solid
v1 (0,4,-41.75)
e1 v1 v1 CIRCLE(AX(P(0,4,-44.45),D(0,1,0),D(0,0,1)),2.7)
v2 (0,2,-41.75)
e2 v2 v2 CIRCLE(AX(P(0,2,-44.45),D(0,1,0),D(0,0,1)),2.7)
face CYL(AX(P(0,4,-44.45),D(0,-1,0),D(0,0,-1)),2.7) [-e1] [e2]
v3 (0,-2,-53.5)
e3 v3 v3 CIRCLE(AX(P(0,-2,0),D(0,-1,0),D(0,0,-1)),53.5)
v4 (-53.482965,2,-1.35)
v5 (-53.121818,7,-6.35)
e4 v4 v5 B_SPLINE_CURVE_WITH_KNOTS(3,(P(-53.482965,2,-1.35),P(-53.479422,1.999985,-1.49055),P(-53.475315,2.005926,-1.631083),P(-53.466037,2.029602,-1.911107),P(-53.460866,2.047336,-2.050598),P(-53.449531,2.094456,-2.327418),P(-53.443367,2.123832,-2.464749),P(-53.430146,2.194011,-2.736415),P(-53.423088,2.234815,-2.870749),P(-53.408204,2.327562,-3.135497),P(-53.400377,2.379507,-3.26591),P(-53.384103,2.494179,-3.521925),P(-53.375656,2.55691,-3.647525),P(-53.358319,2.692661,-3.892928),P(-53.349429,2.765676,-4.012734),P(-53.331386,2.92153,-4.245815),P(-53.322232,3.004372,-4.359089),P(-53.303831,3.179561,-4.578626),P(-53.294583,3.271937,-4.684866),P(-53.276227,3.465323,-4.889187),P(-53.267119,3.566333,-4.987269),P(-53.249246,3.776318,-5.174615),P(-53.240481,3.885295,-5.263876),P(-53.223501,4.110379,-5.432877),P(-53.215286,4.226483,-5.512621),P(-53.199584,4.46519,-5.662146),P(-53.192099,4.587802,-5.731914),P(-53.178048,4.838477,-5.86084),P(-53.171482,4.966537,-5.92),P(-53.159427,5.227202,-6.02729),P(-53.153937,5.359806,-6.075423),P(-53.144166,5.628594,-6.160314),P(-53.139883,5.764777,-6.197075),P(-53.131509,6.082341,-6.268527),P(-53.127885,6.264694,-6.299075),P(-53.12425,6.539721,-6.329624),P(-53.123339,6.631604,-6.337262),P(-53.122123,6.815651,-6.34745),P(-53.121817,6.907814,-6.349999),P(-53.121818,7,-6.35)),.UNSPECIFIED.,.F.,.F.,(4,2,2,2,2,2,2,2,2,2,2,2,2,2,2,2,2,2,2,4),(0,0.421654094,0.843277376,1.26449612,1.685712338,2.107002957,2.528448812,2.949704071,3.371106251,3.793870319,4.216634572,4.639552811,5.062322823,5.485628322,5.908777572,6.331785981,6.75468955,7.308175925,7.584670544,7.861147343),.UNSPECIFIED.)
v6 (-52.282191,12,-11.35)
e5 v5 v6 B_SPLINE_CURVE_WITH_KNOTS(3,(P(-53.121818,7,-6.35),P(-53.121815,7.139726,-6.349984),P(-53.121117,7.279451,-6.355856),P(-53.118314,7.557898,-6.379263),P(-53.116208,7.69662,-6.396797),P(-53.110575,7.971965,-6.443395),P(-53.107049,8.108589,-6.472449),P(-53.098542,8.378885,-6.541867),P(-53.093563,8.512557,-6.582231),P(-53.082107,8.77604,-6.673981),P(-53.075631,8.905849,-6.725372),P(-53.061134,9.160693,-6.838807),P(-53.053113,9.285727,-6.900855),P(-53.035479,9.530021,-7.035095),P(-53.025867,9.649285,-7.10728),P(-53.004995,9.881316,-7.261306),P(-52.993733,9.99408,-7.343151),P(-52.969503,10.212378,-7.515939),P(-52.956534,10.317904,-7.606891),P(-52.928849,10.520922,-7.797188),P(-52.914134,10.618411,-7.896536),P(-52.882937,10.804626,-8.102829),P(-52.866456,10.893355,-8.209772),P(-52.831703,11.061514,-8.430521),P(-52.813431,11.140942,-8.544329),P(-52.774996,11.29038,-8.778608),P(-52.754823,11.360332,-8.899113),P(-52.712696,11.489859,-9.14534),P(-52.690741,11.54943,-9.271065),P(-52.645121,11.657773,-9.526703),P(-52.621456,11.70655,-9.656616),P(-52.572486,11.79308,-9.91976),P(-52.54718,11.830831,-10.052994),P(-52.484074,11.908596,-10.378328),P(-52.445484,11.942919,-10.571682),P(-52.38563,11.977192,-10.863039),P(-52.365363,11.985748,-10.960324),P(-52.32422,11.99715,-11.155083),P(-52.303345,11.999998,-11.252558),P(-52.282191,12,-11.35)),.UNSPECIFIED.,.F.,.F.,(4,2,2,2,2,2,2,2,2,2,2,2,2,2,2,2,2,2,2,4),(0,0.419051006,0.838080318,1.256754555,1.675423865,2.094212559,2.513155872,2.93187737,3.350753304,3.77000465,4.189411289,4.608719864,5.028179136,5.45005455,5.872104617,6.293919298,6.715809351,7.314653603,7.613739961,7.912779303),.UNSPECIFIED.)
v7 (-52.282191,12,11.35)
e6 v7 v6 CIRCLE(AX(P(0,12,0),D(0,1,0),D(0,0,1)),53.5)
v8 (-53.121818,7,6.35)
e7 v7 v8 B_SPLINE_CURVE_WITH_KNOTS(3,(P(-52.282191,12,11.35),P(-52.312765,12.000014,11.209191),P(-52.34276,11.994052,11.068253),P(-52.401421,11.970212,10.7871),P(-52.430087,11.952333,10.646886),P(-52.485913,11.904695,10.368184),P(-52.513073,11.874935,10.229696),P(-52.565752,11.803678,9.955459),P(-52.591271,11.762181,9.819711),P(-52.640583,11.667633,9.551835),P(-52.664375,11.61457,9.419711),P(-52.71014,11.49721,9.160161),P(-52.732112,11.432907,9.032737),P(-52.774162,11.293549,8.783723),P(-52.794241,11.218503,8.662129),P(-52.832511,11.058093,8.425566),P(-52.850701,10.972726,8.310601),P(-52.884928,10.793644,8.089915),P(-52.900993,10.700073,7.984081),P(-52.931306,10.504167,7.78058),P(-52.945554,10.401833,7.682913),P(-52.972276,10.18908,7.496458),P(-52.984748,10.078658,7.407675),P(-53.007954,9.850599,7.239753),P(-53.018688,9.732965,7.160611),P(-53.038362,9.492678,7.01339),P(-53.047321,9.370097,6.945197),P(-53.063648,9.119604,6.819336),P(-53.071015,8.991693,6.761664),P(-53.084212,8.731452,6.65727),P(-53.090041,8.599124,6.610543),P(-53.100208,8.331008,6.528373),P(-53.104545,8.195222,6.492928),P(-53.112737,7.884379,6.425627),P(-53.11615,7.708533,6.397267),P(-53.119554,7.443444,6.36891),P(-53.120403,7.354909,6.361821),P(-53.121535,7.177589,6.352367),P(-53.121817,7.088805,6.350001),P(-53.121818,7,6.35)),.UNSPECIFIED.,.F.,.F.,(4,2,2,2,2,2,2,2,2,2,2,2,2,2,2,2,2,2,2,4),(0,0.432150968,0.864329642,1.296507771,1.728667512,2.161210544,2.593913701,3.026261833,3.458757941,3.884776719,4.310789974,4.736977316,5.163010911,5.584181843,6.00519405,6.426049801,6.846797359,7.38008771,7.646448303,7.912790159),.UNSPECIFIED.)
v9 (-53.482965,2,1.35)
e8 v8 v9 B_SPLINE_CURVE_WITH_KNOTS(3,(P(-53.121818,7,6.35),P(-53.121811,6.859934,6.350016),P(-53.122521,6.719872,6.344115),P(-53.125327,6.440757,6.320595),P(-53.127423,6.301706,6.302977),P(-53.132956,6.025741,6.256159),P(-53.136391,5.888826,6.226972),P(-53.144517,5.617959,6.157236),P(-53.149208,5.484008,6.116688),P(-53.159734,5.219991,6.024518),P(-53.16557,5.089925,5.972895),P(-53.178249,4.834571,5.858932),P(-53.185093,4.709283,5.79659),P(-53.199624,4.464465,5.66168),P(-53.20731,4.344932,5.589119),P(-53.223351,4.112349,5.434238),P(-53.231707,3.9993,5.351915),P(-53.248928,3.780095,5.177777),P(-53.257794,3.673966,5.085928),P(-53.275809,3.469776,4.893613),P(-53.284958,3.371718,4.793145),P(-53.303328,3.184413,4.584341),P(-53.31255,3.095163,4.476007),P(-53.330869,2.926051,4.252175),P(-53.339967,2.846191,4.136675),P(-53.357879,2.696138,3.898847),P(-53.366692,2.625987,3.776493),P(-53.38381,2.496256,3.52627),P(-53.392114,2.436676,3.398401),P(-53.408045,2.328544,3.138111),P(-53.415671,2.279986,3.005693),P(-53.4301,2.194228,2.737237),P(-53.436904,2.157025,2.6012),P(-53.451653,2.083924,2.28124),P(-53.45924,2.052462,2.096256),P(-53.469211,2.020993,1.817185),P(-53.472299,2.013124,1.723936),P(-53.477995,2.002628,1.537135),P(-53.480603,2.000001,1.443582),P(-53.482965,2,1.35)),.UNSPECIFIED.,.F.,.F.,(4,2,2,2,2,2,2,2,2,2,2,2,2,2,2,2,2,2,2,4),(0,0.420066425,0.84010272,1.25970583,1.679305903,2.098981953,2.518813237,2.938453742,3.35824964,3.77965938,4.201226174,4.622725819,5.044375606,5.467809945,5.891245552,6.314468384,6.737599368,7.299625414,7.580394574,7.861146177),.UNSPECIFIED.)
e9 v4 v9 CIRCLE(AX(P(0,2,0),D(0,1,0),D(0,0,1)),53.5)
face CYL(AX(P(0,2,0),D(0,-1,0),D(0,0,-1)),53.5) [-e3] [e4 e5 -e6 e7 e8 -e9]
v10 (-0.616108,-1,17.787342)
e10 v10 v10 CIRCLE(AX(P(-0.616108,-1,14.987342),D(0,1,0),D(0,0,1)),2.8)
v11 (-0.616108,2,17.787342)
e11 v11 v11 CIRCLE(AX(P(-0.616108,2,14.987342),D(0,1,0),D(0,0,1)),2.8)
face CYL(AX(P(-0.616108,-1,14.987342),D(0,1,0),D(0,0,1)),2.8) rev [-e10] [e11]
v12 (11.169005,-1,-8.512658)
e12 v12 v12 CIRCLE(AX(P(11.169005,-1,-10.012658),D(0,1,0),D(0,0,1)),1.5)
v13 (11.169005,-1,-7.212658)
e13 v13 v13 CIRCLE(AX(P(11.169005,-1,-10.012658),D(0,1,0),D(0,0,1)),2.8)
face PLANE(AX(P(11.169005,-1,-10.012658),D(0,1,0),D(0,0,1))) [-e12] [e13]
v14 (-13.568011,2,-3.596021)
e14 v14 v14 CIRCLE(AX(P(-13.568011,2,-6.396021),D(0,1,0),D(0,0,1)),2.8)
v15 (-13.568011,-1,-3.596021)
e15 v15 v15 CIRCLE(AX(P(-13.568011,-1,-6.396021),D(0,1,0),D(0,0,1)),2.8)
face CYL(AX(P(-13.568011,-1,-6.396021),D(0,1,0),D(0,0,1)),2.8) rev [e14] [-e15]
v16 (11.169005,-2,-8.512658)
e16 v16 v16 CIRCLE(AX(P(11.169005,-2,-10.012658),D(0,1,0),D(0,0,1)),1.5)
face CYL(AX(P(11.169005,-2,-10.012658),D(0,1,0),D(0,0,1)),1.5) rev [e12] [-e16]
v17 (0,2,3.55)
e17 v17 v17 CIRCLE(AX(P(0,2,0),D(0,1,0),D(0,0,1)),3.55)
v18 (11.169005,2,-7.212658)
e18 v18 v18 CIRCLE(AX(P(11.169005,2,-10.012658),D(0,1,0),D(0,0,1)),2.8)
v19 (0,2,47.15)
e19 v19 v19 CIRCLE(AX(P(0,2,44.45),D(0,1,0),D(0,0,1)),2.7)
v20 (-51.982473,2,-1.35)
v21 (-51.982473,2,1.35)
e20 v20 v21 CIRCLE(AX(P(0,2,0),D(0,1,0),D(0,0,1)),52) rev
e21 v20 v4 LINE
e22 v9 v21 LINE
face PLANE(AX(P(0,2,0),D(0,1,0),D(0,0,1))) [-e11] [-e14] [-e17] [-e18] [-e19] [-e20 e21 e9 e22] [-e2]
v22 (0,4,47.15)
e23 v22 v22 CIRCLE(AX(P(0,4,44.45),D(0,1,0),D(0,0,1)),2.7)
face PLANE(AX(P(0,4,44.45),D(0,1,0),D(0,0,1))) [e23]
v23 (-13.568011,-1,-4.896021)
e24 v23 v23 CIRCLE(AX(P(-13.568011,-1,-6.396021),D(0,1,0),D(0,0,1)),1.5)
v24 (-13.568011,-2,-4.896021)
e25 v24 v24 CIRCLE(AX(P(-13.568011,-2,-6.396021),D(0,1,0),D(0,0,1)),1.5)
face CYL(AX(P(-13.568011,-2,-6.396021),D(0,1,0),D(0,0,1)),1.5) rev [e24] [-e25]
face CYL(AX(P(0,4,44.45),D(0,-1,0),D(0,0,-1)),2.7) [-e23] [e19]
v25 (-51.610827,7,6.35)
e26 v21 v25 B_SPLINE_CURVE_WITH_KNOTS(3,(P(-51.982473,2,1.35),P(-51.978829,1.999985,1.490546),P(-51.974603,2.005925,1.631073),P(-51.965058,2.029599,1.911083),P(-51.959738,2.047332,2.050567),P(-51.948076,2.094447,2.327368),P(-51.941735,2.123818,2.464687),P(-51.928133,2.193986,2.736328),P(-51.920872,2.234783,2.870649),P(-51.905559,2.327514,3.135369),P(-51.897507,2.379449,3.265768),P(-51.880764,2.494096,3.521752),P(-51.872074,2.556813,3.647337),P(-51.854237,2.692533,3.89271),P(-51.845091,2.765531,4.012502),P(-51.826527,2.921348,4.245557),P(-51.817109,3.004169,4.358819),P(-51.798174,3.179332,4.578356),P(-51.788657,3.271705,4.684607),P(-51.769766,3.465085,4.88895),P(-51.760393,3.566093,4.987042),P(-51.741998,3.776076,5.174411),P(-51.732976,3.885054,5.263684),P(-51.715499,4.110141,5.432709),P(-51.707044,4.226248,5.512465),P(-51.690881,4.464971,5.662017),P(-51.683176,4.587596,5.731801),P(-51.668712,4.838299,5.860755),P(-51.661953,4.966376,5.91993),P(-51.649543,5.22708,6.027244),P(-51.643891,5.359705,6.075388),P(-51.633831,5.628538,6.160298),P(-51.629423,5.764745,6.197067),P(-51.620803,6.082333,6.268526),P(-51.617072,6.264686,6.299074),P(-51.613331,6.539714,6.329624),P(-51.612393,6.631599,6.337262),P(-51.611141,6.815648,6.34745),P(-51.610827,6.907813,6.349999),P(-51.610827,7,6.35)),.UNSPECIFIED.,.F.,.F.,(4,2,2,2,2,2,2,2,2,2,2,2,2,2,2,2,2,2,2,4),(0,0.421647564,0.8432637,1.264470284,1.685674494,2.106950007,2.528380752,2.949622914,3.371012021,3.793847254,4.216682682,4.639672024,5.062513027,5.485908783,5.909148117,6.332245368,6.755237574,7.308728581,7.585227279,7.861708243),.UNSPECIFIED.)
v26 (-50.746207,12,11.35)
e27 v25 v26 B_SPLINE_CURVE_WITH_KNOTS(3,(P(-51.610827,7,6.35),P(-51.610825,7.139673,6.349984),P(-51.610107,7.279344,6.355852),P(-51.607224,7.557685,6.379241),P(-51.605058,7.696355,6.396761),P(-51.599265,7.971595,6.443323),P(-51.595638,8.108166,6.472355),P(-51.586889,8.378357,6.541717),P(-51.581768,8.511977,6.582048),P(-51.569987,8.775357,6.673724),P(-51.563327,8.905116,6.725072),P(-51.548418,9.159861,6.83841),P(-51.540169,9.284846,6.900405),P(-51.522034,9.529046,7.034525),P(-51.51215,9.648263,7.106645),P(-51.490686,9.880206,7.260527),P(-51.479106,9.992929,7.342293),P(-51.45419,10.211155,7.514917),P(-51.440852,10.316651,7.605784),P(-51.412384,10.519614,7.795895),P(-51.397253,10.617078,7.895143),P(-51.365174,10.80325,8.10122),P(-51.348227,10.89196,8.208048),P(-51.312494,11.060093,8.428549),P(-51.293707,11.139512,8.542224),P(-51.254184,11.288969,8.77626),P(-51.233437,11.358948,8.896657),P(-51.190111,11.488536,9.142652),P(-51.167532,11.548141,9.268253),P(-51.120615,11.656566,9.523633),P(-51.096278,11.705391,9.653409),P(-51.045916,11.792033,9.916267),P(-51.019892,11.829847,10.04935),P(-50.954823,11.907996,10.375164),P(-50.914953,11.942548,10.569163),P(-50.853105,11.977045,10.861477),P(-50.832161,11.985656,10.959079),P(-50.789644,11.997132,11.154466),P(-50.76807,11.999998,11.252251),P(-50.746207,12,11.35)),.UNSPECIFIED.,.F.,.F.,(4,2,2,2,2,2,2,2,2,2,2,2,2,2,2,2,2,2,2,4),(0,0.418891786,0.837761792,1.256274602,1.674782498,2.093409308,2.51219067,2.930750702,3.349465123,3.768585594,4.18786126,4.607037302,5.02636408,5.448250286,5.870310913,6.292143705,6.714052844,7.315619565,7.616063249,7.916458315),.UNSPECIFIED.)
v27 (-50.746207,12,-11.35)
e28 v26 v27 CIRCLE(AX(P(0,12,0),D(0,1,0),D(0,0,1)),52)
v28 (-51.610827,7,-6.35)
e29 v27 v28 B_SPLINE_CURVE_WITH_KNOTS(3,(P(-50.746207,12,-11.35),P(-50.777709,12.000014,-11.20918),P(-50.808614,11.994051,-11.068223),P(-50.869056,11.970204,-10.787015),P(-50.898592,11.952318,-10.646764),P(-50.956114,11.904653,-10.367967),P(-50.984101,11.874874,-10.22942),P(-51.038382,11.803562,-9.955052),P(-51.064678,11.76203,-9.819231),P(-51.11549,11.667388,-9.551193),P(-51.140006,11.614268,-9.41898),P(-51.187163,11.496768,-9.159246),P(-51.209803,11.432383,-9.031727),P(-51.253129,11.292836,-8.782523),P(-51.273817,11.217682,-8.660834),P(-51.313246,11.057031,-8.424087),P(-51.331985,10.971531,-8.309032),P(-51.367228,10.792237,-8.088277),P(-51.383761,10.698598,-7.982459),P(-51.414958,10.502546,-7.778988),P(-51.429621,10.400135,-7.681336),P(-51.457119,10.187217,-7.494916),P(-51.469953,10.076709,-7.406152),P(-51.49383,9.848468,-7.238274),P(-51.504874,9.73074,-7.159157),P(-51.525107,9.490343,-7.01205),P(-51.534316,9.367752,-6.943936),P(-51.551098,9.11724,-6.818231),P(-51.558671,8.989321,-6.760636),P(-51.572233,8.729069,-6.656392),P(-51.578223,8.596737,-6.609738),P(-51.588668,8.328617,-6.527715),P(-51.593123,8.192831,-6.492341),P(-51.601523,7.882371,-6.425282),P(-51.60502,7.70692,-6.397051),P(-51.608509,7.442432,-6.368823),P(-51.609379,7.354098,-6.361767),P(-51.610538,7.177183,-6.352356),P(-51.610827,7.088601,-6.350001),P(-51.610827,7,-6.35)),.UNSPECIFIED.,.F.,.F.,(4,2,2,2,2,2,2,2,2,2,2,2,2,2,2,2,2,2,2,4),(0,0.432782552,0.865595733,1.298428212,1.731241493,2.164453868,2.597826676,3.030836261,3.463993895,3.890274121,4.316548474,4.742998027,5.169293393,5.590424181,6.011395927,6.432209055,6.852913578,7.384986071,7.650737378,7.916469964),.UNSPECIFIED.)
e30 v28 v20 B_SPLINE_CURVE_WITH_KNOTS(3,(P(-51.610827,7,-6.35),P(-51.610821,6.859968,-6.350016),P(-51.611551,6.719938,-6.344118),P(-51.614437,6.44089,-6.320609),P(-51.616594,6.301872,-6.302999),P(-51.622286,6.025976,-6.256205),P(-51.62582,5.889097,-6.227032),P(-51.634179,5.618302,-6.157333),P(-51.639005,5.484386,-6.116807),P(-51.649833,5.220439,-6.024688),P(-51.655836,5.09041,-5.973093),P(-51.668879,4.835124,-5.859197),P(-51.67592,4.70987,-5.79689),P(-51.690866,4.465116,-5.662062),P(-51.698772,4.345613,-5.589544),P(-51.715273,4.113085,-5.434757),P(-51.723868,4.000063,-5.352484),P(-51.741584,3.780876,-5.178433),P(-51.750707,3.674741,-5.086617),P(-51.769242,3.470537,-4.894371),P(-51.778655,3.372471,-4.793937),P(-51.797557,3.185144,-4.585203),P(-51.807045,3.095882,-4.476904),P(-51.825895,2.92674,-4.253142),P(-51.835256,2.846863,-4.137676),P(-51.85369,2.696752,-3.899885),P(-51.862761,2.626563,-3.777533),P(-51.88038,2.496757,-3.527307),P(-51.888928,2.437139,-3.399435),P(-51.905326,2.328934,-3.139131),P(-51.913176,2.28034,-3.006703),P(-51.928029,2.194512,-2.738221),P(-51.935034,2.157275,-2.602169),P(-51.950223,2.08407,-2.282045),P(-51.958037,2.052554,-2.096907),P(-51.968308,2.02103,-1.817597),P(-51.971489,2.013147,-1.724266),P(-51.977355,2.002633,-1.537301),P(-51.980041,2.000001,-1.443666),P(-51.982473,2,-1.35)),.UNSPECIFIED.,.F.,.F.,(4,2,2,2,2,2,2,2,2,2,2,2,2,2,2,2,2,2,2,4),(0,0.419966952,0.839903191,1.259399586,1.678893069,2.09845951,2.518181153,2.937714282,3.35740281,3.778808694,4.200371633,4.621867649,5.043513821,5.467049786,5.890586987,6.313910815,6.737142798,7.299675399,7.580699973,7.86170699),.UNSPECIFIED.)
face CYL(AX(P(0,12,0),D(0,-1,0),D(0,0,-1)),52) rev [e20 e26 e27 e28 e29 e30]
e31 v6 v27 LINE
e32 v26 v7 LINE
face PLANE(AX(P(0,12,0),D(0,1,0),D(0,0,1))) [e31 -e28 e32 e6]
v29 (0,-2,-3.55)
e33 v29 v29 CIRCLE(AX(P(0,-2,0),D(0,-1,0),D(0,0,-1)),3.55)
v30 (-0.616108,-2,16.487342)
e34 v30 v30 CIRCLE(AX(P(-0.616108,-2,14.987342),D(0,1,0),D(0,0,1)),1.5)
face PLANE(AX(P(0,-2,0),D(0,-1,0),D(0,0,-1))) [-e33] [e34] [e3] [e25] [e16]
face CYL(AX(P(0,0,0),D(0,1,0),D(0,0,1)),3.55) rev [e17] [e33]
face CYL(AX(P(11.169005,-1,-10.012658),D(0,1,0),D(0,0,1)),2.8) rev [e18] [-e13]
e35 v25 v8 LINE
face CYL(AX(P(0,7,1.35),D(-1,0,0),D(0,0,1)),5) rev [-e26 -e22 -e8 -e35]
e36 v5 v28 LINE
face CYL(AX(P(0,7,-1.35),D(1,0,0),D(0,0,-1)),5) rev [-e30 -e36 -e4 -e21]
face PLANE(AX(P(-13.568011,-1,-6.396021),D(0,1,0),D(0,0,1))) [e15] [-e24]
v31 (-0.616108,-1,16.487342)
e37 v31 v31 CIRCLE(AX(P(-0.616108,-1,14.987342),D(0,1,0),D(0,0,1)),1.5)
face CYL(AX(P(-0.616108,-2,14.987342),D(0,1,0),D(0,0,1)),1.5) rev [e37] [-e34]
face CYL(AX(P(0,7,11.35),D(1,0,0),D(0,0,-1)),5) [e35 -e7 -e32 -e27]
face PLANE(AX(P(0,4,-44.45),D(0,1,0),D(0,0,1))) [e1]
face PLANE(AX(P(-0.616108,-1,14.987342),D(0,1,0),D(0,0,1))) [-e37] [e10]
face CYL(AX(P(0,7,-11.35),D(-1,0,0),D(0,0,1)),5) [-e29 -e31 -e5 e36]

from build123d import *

# Parameters (mm, degrees)
SKETCH1_R           = 53.5
BOSS_EXTRUDE1_DEPTH = 2
SKETCH2_R           = 2.7
BOSS_EXTRUDE2_DEPTH = 2
SKETCH3_R           = 3.55
CUT_EXTRUDE1_DEPTH  = 2
SKETCH7_R           = 53.5
SKETCH7_R_2         = 52
BOSS_EXTRUDE3_DEPTH = 10
SKETCH8_W           = 56.651812746
SKETCH8_H           = 12.7
CUT_EXTRUDE4_DEPTH  = 10
SKETCH13_R          = 53.5
SKETCH13_R_2        = 3.55
BOSS_EXTRUDE4_DEPTH = 2
SKETCH12_R          = 2.8
CUT_EXTRUDE6_DEPTH  = 3
SKETCH16_R          = 1.5
CUT_EXTRUDE8_DEPTH  = 77.769134423
FILLET3_R           = 5


with BuildPart() as part:
    # Sketch1 → Boss-Extrude1 (new body)
    with BuildSketch(Plane(origin=(0, 0, 0), x_dir=(1, 0, 0), z_dir=(0, 1, 0))):
        with Locations(Location((0, 0, 0), (0, 0, 270))):
            Circle(SKETCH1_R)
    extrude(amount=BOSS_EXTRUDE1_DEPTH)

    # Sketch2 → Boss-Extrude2 (add)
    with BuildSketch(Plane(origin=(0, 2, 0), x_dir=(1, 0, 0), z_dir=(0, 1, 0))):
        with Locations(Location((0, -44.45, 0), (0, 0, 270))):
            Circle(SKETCH2_R)
        with Locations(Location((0, 44.45, 0), (0, 0, 270))):
            Circle(SKETCH2_R)
    extrude(amount=BOSS_EXTRUDE2_DEPTH)

    # Sketch3 → Cut-Extrude1 (cut)
    with BuildSketch(Plane(origin=(0, 2, 0), x_dir=(1, 0, 0), z_dir=(0, 1, 0))):
        with Locations(Location((0, 0, 0), (0, 0, 270))):
            Circle(SKETCH3_R)
    extrude(amount=-CUT_EXTRUDE1_DEPTH, mode=Mode.SUBTRACT)

    # Sketch7 → Boss-Extrude3 (add)
    with BuildSketch(Plane(origin=(0, 2, 0), x_dir=(1, 0, 0), z_dir=(0, 1, 0))):
        with Locations(Location((0, 0, 0), (0, 0, 270))):
            Circle(SKETCH7_R)
        with Locations(Location((0, 0, 0), (0, 0, 270))):
            Circle(SKETCH7_R_2, mode=Mode.SUBTRACT)
    extrude(amount=BOSS_EXTRUDE3_DEPTH)

    # Sketch8 → Cut-Extrude4 (cut)
    with BuildSketch(Plane(origin=(0, 2, 0), x_dir=(1, 0, 0), z_dir=(0, 1, 0))):
        with Locations((-28.325906373, 0)):
            Rectangle(SKETCH8_W, SKETCH8_H)
    extrude(amount=CUT_EXTRUDE4_DEPTH, mode=Mode.SUBTRACT)

    # Sketch13 → Boss-Extrude4 (add)
    with BuildSketch(Plane.XZ):
        with Locations(Location((0, 0, 0), (0, 0, 270))):
            Circle(SKETCH13_R)
        with Locations(Location((0, 0, 0), (0, 0, 90))):
            Circle(SKETCH13_R_2, mode=Mode.SUBTRACT)
    extrude(amount=BOSS_EXTRUDE4_DEPTH)

    # Sketch12 → Cut-Extrude6 (cut)
    with BuildSketch(Plane(origin=(0, 2, 0), x_dir=(1, 0, 0), z_dir=(0, 1, 0))):
        with Locations(Location((11.16900504, 10.012658309, 0), (0, 0, 270))):
            Circle(SKETCH12_R)
        with Locations(Location((-0.61610798, -14.987341691, 0), (0, 0, 270))):
            Circle(SKETCH12_R)
        with Locations(Location((-13.568010506, 6.396021491, 0), (0, 0, 270))):
            Circle(SKETCH12_R)
    extrude(amount=-CUT_EXTRUDE6_DEPTH, mode=Mode.SUBTRACT)

    # Sketch16 → Cut-Extrude8 (cut, through all)
    with BuildSketch(Plane(origin=(0, -1, 0), x_dir=(1, 0, 0), z_dir=(0, 1, 0))):
        with Locations(Location((11.16900504, 10.012658309, 0), (0, 0, 270))):
            Circle(SKETCH16_R)
        with Locations(Location((-0.61610798, -14.987341691, 0), (0, 0, 270))):
            Circle(SKETCH16_R)
        with Locations(Location((-13.568010506, 6.396021491, 0), (0, 0, 270))):
            Circle(SKETCH16_R)
    extrude(amount=-CUT_EXTRUDE8_DEPTH, mode=Mode.SUBTRACT)

    # Fillet3
    fillet3_edges = [part.edges().sort_by_distance(p)[0] for p in [
        (-52.366322452, 12, -6.35),
        (-52.366322452, 12, 6.35),
        (-52.366322452, 2, 6.35),
        (-52.366322452, 2, -6.35),
    ]]
    fillet(fillet3_edges, radius=FILLET3_R - 0.0001)  # a hair under: the kernel refuses the full size


solid = part.part
